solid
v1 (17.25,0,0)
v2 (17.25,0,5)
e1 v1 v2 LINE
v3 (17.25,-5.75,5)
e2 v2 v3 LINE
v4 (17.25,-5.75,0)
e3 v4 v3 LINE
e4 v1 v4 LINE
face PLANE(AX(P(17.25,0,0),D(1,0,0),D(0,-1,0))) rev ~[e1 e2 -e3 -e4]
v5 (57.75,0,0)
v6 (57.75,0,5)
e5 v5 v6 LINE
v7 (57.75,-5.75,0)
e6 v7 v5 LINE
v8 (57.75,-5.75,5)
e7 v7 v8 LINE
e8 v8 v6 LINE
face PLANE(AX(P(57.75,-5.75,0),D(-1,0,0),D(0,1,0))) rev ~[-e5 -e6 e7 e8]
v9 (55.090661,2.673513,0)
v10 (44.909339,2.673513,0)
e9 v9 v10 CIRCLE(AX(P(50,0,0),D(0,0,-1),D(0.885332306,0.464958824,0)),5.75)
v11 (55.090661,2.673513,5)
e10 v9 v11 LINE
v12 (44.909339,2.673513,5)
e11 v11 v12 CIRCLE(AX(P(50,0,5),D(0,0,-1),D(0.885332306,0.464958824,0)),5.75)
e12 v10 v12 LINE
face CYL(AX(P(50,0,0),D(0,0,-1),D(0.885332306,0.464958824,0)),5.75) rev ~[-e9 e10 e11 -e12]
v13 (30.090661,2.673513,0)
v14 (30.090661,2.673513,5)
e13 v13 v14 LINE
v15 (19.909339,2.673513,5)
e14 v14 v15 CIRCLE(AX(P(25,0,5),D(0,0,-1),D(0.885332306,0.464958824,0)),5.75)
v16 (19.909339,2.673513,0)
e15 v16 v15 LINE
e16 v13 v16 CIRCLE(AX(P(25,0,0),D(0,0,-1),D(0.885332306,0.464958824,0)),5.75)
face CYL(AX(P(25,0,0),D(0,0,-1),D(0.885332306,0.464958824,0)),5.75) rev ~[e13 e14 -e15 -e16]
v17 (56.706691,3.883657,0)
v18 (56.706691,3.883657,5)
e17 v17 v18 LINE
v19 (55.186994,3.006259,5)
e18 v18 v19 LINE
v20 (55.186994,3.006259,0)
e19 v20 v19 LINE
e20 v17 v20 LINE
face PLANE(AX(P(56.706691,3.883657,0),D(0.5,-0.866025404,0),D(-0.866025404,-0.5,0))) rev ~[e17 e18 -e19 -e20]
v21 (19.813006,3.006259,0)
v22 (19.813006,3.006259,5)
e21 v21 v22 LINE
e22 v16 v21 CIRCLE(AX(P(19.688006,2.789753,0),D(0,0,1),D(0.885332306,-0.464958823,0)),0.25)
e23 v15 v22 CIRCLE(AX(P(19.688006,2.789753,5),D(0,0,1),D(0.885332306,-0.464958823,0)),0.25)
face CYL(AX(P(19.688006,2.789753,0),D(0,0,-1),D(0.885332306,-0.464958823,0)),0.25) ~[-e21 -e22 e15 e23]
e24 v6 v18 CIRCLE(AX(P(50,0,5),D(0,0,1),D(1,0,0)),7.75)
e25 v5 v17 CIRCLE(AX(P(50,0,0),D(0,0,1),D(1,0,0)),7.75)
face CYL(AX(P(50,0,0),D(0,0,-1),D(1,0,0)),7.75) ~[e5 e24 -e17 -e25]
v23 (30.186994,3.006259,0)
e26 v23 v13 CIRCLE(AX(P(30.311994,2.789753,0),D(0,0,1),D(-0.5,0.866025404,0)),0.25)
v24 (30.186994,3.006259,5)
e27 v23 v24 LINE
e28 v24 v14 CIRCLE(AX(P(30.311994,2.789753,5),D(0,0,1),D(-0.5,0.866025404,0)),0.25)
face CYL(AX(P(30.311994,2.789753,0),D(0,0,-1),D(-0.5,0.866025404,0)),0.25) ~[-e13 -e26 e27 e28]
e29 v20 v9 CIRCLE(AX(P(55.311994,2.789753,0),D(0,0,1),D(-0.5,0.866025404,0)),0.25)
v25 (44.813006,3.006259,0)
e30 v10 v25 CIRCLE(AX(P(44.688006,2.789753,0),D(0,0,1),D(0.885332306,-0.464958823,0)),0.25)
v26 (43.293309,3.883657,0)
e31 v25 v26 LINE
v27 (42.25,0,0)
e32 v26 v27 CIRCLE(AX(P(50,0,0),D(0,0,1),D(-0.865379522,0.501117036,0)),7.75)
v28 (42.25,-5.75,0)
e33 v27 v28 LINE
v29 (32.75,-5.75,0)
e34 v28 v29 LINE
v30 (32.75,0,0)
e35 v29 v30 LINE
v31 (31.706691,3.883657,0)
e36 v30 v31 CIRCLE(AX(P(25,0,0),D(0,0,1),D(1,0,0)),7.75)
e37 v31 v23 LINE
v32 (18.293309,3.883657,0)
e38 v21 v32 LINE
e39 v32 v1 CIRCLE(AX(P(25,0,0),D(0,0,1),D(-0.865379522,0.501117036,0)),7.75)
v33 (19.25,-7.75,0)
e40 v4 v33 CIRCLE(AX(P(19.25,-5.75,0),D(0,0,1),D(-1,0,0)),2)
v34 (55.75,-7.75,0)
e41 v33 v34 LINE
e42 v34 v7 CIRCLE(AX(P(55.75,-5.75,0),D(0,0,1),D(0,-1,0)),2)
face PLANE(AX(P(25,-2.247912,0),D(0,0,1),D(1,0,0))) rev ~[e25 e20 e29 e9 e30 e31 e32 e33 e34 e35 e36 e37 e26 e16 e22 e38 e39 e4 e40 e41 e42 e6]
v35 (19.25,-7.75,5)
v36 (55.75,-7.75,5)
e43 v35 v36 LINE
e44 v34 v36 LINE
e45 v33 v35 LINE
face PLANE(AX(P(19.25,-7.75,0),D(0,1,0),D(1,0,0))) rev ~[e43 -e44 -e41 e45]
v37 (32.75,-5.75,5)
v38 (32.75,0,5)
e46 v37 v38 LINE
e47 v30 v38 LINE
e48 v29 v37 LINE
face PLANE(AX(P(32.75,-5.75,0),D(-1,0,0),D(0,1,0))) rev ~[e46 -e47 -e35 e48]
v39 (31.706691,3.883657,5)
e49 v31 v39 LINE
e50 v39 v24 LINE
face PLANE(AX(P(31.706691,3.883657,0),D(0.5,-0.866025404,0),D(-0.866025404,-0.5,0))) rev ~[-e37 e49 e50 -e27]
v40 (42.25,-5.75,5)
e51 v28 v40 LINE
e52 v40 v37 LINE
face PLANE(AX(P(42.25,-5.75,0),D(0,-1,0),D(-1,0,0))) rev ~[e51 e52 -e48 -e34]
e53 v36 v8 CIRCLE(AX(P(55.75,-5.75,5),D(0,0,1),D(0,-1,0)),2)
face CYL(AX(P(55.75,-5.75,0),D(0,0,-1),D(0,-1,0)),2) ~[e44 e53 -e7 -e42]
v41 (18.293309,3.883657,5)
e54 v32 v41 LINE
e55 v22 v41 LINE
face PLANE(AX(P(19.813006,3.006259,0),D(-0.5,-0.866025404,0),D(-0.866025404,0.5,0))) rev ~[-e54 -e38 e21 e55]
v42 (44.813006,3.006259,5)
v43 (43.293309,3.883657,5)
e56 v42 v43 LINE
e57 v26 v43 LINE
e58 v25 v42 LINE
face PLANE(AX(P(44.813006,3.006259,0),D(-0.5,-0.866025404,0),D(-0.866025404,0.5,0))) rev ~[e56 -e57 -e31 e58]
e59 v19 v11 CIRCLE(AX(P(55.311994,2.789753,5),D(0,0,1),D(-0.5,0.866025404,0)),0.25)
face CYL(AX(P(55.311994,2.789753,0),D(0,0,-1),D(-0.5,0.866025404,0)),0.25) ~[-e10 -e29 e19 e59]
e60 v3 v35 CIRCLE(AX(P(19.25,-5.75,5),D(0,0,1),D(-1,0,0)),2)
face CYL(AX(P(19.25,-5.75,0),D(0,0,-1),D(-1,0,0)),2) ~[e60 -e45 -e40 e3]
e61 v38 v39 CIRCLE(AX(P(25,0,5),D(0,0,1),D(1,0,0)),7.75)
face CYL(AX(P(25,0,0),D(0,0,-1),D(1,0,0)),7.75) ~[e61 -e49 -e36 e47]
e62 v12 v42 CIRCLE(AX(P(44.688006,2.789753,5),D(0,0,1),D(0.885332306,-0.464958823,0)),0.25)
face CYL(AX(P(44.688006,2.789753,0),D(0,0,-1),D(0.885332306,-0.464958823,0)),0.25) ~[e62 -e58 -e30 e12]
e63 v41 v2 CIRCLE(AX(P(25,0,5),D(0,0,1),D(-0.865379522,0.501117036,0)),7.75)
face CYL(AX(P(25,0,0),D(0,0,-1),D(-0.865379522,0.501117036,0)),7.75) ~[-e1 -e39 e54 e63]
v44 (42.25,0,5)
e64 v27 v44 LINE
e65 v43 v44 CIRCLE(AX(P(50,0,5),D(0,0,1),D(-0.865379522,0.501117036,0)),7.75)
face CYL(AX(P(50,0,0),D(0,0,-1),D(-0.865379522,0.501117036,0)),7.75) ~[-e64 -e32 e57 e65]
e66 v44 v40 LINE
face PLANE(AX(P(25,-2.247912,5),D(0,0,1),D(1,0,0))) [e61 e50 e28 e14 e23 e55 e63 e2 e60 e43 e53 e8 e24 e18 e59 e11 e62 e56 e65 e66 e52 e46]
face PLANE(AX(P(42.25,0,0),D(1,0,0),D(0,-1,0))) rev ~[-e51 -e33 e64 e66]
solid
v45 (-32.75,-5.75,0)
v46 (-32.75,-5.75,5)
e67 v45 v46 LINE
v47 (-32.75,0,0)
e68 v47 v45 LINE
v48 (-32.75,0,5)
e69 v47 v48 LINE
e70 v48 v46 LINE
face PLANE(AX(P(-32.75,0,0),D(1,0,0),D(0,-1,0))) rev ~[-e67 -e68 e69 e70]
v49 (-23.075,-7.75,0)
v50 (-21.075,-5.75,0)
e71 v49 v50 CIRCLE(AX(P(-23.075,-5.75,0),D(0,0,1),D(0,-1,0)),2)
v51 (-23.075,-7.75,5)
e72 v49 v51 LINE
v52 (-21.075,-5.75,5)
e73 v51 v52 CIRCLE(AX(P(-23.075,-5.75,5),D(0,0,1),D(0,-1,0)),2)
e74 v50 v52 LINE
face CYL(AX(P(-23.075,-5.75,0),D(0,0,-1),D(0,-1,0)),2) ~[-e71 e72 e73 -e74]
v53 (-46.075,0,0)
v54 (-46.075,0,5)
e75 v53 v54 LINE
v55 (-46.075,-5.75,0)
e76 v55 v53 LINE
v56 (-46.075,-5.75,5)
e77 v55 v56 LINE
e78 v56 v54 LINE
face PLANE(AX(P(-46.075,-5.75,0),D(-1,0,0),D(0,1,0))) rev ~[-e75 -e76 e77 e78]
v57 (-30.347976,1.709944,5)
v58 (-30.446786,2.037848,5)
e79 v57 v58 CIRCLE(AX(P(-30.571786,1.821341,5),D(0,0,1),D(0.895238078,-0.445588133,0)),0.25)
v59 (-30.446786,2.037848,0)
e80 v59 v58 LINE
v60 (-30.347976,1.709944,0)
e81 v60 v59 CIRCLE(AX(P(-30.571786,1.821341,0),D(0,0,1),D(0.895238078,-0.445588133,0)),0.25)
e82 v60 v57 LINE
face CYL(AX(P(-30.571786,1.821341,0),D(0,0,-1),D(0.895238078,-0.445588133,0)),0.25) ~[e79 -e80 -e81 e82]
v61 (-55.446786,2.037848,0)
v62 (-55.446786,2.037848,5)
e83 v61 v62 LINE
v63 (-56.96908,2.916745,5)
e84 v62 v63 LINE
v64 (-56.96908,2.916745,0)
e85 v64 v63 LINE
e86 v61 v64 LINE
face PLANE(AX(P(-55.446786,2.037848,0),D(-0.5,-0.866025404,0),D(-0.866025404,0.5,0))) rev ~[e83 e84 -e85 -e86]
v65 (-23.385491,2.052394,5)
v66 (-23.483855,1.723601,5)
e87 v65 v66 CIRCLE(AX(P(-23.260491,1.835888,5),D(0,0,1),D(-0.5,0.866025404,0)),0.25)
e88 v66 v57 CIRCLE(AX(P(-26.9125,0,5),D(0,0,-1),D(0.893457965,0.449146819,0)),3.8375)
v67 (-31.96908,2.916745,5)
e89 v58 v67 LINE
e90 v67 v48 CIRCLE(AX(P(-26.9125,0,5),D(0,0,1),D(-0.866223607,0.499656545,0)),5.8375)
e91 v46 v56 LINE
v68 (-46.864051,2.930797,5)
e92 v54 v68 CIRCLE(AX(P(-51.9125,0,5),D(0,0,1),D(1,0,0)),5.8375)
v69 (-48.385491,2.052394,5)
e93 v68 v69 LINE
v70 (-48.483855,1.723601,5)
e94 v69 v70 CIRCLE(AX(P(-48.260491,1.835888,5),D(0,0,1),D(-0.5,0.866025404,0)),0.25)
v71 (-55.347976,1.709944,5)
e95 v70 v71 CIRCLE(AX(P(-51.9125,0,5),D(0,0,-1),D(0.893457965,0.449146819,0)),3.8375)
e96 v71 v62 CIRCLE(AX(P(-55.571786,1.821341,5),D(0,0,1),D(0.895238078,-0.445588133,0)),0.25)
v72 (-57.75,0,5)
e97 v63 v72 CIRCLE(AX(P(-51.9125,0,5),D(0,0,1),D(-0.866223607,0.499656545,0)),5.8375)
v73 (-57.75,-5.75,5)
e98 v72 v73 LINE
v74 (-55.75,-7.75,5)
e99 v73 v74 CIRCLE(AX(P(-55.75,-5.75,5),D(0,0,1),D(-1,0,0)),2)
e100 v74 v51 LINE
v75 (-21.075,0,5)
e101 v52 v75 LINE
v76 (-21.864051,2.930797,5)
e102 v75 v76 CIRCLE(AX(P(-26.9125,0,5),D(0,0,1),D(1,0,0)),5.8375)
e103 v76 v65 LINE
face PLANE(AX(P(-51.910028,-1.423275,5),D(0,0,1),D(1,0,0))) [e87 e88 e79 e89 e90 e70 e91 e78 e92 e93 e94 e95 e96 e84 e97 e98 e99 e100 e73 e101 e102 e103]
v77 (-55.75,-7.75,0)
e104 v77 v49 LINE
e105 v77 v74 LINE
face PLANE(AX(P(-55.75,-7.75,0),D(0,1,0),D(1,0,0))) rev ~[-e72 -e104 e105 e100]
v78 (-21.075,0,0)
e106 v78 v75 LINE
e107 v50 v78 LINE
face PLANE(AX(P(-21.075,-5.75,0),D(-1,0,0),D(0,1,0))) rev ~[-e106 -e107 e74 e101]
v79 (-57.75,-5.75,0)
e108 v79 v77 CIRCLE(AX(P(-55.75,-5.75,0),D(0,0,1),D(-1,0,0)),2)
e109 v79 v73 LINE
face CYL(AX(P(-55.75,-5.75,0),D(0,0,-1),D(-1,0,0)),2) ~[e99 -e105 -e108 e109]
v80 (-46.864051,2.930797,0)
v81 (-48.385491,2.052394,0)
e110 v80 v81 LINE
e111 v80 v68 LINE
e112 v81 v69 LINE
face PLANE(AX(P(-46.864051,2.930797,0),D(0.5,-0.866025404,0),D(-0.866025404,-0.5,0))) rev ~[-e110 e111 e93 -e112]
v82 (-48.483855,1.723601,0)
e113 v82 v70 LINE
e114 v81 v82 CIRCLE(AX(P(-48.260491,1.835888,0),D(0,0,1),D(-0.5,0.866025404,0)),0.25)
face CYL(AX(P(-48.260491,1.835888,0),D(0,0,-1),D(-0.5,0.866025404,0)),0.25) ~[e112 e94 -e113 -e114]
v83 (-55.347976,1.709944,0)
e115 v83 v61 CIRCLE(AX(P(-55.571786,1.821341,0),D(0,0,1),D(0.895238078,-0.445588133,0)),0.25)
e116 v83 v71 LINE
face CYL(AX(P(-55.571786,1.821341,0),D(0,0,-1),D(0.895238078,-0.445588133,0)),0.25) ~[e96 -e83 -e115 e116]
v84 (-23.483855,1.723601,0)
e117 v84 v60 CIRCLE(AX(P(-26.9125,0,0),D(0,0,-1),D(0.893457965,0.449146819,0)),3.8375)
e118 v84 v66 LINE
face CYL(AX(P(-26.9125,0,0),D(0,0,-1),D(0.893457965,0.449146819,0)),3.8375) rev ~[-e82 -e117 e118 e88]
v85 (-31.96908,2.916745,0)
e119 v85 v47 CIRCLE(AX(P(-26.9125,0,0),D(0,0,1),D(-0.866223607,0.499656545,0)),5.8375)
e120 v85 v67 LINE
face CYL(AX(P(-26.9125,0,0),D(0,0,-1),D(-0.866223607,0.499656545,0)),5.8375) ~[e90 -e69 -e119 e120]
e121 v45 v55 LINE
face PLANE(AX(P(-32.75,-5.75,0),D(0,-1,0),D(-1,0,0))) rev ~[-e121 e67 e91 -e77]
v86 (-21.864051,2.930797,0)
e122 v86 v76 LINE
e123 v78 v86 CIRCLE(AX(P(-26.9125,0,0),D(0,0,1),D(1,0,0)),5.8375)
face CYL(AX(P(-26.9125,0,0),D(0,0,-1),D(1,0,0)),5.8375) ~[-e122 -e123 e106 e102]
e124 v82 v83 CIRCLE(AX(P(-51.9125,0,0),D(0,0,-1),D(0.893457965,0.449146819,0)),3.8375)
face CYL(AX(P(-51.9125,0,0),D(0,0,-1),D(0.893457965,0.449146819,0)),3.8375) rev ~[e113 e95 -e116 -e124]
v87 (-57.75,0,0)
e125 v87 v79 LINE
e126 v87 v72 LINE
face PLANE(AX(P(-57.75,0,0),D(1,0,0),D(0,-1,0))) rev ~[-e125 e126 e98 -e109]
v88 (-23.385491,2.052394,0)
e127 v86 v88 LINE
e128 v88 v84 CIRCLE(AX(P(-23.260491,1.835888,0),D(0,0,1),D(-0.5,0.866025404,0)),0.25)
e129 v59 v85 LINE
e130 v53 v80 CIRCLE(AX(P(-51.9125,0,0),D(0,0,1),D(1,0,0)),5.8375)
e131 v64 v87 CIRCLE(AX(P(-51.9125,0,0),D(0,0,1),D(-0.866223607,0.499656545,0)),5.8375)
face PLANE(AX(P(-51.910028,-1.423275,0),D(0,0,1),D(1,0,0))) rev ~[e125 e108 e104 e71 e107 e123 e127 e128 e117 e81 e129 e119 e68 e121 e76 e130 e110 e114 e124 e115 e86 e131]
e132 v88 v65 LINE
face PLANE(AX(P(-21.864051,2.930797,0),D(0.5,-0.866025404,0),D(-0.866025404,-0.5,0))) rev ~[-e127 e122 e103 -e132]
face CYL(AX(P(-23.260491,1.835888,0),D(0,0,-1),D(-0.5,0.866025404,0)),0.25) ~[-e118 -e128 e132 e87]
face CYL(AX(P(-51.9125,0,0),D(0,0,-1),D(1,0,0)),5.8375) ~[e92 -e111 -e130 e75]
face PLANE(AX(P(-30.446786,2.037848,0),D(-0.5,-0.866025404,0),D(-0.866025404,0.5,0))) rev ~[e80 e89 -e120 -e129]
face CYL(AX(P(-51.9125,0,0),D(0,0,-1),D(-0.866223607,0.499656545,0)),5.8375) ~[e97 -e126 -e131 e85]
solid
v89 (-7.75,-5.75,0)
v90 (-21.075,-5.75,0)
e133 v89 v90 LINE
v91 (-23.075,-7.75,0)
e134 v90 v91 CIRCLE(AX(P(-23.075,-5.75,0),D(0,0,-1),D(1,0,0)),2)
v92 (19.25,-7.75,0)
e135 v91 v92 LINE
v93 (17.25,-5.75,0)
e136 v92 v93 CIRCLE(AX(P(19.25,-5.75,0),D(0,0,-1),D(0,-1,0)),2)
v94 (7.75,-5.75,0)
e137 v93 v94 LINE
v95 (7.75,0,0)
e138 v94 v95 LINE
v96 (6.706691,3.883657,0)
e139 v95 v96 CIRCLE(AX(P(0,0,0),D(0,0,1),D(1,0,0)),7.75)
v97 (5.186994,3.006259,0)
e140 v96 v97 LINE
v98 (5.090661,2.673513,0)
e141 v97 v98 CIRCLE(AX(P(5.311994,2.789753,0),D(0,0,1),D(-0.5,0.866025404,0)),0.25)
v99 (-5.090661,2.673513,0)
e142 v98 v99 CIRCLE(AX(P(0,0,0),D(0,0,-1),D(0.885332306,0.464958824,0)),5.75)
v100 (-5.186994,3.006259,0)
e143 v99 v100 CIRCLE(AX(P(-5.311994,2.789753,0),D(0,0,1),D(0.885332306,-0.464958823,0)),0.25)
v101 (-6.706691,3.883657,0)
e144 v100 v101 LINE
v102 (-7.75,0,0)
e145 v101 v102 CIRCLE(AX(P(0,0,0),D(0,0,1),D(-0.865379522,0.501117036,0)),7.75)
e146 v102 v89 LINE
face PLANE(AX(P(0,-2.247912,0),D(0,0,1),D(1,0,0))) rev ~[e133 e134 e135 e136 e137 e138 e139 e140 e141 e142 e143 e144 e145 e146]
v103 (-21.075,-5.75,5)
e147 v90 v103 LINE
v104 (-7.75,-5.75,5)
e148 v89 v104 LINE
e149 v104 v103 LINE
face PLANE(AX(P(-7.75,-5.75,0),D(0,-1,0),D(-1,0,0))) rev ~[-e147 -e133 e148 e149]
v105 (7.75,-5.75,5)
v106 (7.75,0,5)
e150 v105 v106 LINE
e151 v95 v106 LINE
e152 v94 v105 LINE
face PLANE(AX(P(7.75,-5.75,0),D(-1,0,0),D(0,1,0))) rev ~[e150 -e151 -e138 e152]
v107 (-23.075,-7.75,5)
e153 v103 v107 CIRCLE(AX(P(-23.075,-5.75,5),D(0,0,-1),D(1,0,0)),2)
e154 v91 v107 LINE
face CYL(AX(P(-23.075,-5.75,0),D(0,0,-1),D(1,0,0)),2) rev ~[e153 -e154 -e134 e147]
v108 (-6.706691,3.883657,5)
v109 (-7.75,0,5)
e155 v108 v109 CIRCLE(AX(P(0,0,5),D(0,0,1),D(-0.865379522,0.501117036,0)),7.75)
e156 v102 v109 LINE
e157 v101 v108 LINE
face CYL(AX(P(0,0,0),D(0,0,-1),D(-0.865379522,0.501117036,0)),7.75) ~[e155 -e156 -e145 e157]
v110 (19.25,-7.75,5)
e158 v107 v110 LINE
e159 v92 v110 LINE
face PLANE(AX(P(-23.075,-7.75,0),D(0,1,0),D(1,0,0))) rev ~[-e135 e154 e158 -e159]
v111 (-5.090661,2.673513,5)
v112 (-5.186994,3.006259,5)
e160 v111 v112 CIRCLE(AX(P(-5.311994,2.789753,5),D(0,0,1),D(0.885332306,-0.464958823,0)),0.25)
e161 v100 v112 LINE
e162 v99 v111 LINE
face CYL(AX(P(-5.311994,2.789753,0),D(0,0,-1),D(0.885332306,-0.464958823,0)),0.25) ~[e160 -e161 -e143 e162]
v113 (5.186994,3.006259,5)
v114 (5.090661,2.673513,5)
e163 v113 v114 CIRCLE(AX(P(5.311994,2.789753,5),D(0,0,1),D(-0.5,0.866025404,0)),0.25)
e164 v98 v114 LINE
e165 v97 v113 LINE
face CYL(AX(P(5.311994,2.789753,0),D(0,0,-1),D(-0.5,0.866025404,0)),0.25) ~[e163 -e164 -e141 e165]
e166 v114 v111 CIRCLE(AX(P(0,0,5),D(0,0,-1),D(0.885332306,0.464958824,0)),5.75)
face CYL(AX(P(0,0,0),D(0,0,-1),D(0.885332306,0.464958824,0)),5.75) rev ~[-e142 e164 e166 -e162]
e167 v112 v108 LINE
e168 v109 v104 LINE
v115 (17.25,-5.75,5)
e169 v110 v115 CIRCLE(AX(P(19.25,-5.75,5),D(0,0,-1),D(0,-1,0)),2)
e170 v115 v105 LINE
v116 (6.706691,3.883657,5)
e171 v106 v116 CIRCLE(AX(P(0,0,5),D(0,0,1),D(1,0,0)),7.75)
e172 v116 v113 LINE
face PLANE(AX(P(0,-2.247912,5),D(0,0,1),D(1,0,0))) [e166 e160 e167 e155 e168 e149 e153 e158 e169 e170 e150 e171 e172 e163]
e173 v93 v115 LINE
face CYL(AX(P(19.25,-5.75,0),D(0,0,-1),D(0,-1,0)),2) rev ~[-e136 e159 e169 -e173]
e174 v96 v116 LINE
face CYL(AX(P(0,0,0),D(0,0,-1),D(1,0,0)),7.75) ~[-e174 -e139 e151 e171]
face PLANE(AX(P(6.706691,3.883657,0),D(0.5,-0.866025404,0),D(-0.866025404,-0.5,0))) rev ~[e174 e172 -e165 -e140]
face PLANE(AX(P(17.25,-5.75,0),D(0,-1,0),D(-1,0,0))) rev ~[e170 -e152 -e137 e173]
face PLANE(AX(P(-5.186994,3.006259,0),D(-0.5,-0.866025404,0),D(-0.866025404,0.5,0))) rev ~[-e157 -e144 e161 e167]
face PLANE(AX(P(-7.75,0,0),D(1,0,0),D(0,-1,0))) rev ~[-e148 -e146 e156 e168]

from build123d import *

# Parameters (mm, degrees)
F1_DEPTH = 5
F2_DEPTH = 5


# Not quite as in the source:
# - a feature names something its author has since deleted; it is built from what else it names


with BuildPart() as f1:
    # F0 (on Top) → F1 (new body)
    with BuildSketch(Plane.XY):
        with BuildLine():
            ThreePointArc((5.0906607601, 2.6735132364), (0, -5.75), (-5.0906607601, 2.6735132364))
            ThreePointArc((-5.0906607601, 2.6735132364), (-5.0718550548, 2.8592753519), (-5.1869938367, 3.0062592933))
            Line((-5.1869938367, 3.0062592933), (-6.7066912921, 3.8836570282))
            ThreePointArc((-6.7066912921, 3.8836570282), (-7.4846295003, 2.0106768122), (-7.75, 0))
            ThreePointArc((-7.75, 0), (-5.4800775542, -5.4800775542), (0, -7.75))
            ThreePointArc((0, -7.75), (5.4800775542, -5.4800775542), (7.75, 0))
            ThreePointArc((7.75, 0), (7.4846295003, 2.0106768122), (6.7066912921, 3.8836570282))
            Line((6.7066912921, 3.8836570282), (5.1869938367, 3.0062592933))
            ThreePointArc((5.1869938367, 3.0062592933), (5.0718550548, 2.8592753519), (5.0906607601, 2.6735132364))
        make_face()
        with BuildLine():
            ThreePointArc((0, -7.75), (-5.4800775542, -5.4800775542), (-7.75, 0))
            Line((-7.75, 0), (-7.75, -5.75))
            Line((-7.75, -5.75), (-21.075, -5.75))
            ThreePointArc((-21.075, -5.75), (-21.6607864376, -7.1642135624), (-23.075, -7.75))
            Line((-23.075, -7.75), (-7.75, -7.75))
            Line((-7.75, -7.75), (-5.75, -7.75))
            Line((-5.75, -7.75), (0, -7.75))
        make_face()
        with BuildLine():
            Line((7.75, -5.75), (7.75, 0))
            ThreePointArc((7.75, 0), (5.4800775542, -5.4800775542), (0, -7.75))
            Line((0, -7.75), (5.75, -7.75))
            Line((5.75, -7.75), (19.25, -7.75))
            ThreePointArc((19.25, -7.75), (17.8357864376, -7.1642135624), (17.25, -5.75))
            Line((17.25, -5.75), (7.75, -5.75))
        make_face()
    extrude(amount=F1_DEPTH)


with BuildPart() as f2:
    # F0 (on Top) → F2 (new body)
    with BuildSketch(Plane.XY):
        with BuildLine():
            ThreePointArc((-57.75, 0), (-51.9125, -5.8375), (-46.075, 0))
            ThreePointArc((-46.075, 0), (-46.2757134574, 1.5175782427), (-46.8640513825, 2.9307972987))
            Line((-46.8640513825, 2.9307972987), (-48.3854905692, 2.0523939747))
            ThreePointArc((-48.3854905692, 2.0523939747), (-48.5000018905, 1.9075418417), (-48.4838550604, 1.723600919))
            ThreePointArc((-48.4838550604, 1.723600919), (-51.9048651488, -3.8374924051), (-55.3479761214, 1.7099444637))
            ThreePointArc((-55.3479761214, 1.7099444637), (-55.3324173522, 1.8934720901), (-55.4467856407, 2.0378478482))
            Line((-55.4467856407, 2.0378478482), (-56.9690803045, 2.9167450821))
            ThreePointArc((-56.9690803045, 2.9167450821), (-57.5513914592, 1.5097381764), (-57.75, 0))
        make_face()
        with BuildLine():
            Line((-55.75, -7.75), (-48.075, -7.75))
            ThreePointArc((-48.075, -7.75), (-46.6607864376, -7.1642135624), (-46.075, -5.75))
            Line((-46.075, -5.75), (-46.075, 0))
            ThreePointArc((-46.075, 0), (-51.9125, -5.8375), (-57.75, 0))
            Line((-57.75, 0), (-57.75, -5.75))
            ThreePointArc((-57.75, -5.75), (-57.1642135624, -7.1642135624), (-55.75, -7.75))
        make_face()
        with BuildLine():
            ThreePointArc((-32.75, 0), (-26.9125, -5.8375), (-21.075, 0))
            ThreePointArc((-21.075, 0), (-21.2757134574, 1.5175782427), (-21.8640513825, 2.9307972987))
            Line((-21.8640513825, 2.9307972987), (-23.3854905692, 2.0523939747))
            ThreePointArc((-23.3854905692, 2.0523939747), (-23.5000018905, 1.9075418417), (-23.4838550604, 1.723600919))
            ThreePointArc((-23.4838550604, 1.723600919), (-26.9048651488, -3.8374924051), (-30.3479761214, 1.7099444637))
            ThreePointArc((-30.3479761214, 1.7099444637), (-30.3324173522, 1.8934720901), (-30.4467856407, 2.0378478482))
            Line((-30.4467856407, 2.0378478482), (-31.9690803045, 2.9167450821))
            ThreePointArc((-31.9690803045, 2.9167450821), (-32.5513914592, 1.5097381764), (-32.75, 0))
        make_face()
        with BuildLine():
            ThreePointArc((-23.075, -7.75), (-21.6607864376, -7.1642135624), (-21.075, -5.75))
            Line((-21.075, -5.75), (-21.075, 0))
            ThreePointArc((-21.075, 0), (-26.9125, -5.8375), (-32.75, 0))
            Line((-32.75, 0), (-32.75, -5.75))
            ThreePointArc((-32.75, -5.75), (-32.1642135624, -7.1642135624), (-30.75, -7.75))
            Line((-30.75, -7.75), (-23.075, -7.75))
        make_face()
        with BuildLine():
            Line((-48.075, -7.75), (-30.75, -7.75))
            ThreePointArc((-30.75, -7.75), (-32.1642135624, -7.1642135624), (-32.75, -5.75))
            Line((-32.75, -5.75), (-46.075, -5.75))
            ThreePointArc((-46.075, -5.75), (-46.6607864376, -7.1642135624), (-48.075, -7.75))
        make_face()
    extrude(amount=F2_DEPTH)


with BuildPart() as f2b:
    # F0 (on Top) → F2, piece 2 (new body)
    with BuildSketch(Plane.XY):
        with BuildLine():
            ThreePointArc((18.2933087079, 3.8836570282), (17.5153704997, 2.0106768122), (17.25, 0))
            ThreePointArc((17.25, 0), (19.5199224458, -5.4800775542), (25, -7.75))
            ThreePointArc((25, -7.75), (30.4800775542, -5.4800775542), (32.75, 0))
            ThreePointArc((32.75, 0), (32.4846295003, 2.0106768122), (31.7066912921, 3.8836570282))
            Line((31.7066912921, 3.8836570282), (30.1869938367, 3.0062592933))
            ThreePointArc((30.1869938367, 3.0062592933), (30.0718550548, 2.8592753519), (30.0906607601, 2.6735132364))
            ThreePointArc((30.0906607601, 2.6735132364), (25, -5.75), (19.9093392399, 2.6735132364))
            ThreePointArc((19.9093392399, 2.6735132364), (19.9281449452, 2.8592753519), (19.8130061633, 3.0062592933))
            Line((19.8130061633, 3.0062592933), (18.2933087079, 3.8836570282))
        make_face()
        with BuildLine():
            Line((17.25, 0), (17.25, -5.75))
            ThreePointArc((17.25, -5.75), (17.8357864376, -7.1642135624), (19.25, -7.75))
            Line((19.25, -7.75), (25, -7.75))
            ThreePointArc((25, -7.75), (19.5199224458, -5.4800775542), (17.25, 0))
        make_face()
        with BuildLine():
            ThreePointArc((32.75, 0), (30.4800775542, -5.4800775542), (25, -7.75))
            Line((25, -7.75), (30.75, -7.75))
            ThreePointArc((30.75, -7.75), (32.1642135624, -7.1642135624), (32.75, -5.75))
            Line((32.75, -5.75), (32.75, 0))
        make_face()
        with BuildLine():
            ThreePointArc((42.25, 0), (44.5199224458, -5.4800775542), (50, -7.75))
            ThreePointArc((50, -7.75), (55.4800775542, -5.4800775542), (57.75, 0))
            ThreePointArc((57.75, 0), (57.4846295003, 2.0106768122), (56.7066912921, 3.8836570282))
            Line((56.7066912921, 3.8836570282), (55.1869938367, 3.0062592933))
            ThreePointArc((55.1869938367, 3.0062592933), (55.0718550548, 2.8592753519), (55.0906607601, 2.6735132364))
            ThreePointArc((55.0906607601, 2.6735132364), (50, -5.75), (44.9093392399, 2.6735132364))
            ThreePointArc((44.9093392399, 2.6735132364), (44.9281449452, 2.8592753519), (44.8130061633, 3.0062592933))
            Line((44.8130061633, 3.0062592933), (43.2933087079, 3.8836570282))
            ThreePointArc((43.2933087079, 3.8836570282), (42.5153704997, 2.0106768122), (42.25, 0))
        make_face()
        with BuildLine():
            ThreePointArc((42.25, -5.75), (42.8357864376, -7.1642135624), (44.25, -7.75))
            Line((44.25, -7.75), (50, -7.75))
            ThreePointArc((50, -7.75), (44.5199224458, -5.4800775542), (42.25, 0))
            Line((42.25, 0), (42.25, -5.75))
        make_face()
        with BuildLine():
            ThreePointArc((57.75, 0), (55.4800775542, -5.4800775542), (50, -7.75))
            Line((50, -7.75), (55.75, -7.75))
            ThreePointArc((55.75, -7.75), (57.1642135624, -7.1642135624), (57.75, -5.75))
            Line((57.75, -5.75), (57.75, 0))
        make_face()
        with BuildLine():
            ThreePointArc((32.75, -5.75), (32.1642135624, -7.1642135624), (30.75, -7.75))
            Line((30.75, -7.75), (44.25, -7.75))
            ThreePointArc((44.25, -7.75), (42.8357864376, -7.1642135624), (42.25, -5.75))
            Line((42.25, -5.75), (32.75, -5.75))
        make_face()
    extrude(amount=F2_DEPTH)


solid = Compound([f1.part, f2.part, f2b.part])
